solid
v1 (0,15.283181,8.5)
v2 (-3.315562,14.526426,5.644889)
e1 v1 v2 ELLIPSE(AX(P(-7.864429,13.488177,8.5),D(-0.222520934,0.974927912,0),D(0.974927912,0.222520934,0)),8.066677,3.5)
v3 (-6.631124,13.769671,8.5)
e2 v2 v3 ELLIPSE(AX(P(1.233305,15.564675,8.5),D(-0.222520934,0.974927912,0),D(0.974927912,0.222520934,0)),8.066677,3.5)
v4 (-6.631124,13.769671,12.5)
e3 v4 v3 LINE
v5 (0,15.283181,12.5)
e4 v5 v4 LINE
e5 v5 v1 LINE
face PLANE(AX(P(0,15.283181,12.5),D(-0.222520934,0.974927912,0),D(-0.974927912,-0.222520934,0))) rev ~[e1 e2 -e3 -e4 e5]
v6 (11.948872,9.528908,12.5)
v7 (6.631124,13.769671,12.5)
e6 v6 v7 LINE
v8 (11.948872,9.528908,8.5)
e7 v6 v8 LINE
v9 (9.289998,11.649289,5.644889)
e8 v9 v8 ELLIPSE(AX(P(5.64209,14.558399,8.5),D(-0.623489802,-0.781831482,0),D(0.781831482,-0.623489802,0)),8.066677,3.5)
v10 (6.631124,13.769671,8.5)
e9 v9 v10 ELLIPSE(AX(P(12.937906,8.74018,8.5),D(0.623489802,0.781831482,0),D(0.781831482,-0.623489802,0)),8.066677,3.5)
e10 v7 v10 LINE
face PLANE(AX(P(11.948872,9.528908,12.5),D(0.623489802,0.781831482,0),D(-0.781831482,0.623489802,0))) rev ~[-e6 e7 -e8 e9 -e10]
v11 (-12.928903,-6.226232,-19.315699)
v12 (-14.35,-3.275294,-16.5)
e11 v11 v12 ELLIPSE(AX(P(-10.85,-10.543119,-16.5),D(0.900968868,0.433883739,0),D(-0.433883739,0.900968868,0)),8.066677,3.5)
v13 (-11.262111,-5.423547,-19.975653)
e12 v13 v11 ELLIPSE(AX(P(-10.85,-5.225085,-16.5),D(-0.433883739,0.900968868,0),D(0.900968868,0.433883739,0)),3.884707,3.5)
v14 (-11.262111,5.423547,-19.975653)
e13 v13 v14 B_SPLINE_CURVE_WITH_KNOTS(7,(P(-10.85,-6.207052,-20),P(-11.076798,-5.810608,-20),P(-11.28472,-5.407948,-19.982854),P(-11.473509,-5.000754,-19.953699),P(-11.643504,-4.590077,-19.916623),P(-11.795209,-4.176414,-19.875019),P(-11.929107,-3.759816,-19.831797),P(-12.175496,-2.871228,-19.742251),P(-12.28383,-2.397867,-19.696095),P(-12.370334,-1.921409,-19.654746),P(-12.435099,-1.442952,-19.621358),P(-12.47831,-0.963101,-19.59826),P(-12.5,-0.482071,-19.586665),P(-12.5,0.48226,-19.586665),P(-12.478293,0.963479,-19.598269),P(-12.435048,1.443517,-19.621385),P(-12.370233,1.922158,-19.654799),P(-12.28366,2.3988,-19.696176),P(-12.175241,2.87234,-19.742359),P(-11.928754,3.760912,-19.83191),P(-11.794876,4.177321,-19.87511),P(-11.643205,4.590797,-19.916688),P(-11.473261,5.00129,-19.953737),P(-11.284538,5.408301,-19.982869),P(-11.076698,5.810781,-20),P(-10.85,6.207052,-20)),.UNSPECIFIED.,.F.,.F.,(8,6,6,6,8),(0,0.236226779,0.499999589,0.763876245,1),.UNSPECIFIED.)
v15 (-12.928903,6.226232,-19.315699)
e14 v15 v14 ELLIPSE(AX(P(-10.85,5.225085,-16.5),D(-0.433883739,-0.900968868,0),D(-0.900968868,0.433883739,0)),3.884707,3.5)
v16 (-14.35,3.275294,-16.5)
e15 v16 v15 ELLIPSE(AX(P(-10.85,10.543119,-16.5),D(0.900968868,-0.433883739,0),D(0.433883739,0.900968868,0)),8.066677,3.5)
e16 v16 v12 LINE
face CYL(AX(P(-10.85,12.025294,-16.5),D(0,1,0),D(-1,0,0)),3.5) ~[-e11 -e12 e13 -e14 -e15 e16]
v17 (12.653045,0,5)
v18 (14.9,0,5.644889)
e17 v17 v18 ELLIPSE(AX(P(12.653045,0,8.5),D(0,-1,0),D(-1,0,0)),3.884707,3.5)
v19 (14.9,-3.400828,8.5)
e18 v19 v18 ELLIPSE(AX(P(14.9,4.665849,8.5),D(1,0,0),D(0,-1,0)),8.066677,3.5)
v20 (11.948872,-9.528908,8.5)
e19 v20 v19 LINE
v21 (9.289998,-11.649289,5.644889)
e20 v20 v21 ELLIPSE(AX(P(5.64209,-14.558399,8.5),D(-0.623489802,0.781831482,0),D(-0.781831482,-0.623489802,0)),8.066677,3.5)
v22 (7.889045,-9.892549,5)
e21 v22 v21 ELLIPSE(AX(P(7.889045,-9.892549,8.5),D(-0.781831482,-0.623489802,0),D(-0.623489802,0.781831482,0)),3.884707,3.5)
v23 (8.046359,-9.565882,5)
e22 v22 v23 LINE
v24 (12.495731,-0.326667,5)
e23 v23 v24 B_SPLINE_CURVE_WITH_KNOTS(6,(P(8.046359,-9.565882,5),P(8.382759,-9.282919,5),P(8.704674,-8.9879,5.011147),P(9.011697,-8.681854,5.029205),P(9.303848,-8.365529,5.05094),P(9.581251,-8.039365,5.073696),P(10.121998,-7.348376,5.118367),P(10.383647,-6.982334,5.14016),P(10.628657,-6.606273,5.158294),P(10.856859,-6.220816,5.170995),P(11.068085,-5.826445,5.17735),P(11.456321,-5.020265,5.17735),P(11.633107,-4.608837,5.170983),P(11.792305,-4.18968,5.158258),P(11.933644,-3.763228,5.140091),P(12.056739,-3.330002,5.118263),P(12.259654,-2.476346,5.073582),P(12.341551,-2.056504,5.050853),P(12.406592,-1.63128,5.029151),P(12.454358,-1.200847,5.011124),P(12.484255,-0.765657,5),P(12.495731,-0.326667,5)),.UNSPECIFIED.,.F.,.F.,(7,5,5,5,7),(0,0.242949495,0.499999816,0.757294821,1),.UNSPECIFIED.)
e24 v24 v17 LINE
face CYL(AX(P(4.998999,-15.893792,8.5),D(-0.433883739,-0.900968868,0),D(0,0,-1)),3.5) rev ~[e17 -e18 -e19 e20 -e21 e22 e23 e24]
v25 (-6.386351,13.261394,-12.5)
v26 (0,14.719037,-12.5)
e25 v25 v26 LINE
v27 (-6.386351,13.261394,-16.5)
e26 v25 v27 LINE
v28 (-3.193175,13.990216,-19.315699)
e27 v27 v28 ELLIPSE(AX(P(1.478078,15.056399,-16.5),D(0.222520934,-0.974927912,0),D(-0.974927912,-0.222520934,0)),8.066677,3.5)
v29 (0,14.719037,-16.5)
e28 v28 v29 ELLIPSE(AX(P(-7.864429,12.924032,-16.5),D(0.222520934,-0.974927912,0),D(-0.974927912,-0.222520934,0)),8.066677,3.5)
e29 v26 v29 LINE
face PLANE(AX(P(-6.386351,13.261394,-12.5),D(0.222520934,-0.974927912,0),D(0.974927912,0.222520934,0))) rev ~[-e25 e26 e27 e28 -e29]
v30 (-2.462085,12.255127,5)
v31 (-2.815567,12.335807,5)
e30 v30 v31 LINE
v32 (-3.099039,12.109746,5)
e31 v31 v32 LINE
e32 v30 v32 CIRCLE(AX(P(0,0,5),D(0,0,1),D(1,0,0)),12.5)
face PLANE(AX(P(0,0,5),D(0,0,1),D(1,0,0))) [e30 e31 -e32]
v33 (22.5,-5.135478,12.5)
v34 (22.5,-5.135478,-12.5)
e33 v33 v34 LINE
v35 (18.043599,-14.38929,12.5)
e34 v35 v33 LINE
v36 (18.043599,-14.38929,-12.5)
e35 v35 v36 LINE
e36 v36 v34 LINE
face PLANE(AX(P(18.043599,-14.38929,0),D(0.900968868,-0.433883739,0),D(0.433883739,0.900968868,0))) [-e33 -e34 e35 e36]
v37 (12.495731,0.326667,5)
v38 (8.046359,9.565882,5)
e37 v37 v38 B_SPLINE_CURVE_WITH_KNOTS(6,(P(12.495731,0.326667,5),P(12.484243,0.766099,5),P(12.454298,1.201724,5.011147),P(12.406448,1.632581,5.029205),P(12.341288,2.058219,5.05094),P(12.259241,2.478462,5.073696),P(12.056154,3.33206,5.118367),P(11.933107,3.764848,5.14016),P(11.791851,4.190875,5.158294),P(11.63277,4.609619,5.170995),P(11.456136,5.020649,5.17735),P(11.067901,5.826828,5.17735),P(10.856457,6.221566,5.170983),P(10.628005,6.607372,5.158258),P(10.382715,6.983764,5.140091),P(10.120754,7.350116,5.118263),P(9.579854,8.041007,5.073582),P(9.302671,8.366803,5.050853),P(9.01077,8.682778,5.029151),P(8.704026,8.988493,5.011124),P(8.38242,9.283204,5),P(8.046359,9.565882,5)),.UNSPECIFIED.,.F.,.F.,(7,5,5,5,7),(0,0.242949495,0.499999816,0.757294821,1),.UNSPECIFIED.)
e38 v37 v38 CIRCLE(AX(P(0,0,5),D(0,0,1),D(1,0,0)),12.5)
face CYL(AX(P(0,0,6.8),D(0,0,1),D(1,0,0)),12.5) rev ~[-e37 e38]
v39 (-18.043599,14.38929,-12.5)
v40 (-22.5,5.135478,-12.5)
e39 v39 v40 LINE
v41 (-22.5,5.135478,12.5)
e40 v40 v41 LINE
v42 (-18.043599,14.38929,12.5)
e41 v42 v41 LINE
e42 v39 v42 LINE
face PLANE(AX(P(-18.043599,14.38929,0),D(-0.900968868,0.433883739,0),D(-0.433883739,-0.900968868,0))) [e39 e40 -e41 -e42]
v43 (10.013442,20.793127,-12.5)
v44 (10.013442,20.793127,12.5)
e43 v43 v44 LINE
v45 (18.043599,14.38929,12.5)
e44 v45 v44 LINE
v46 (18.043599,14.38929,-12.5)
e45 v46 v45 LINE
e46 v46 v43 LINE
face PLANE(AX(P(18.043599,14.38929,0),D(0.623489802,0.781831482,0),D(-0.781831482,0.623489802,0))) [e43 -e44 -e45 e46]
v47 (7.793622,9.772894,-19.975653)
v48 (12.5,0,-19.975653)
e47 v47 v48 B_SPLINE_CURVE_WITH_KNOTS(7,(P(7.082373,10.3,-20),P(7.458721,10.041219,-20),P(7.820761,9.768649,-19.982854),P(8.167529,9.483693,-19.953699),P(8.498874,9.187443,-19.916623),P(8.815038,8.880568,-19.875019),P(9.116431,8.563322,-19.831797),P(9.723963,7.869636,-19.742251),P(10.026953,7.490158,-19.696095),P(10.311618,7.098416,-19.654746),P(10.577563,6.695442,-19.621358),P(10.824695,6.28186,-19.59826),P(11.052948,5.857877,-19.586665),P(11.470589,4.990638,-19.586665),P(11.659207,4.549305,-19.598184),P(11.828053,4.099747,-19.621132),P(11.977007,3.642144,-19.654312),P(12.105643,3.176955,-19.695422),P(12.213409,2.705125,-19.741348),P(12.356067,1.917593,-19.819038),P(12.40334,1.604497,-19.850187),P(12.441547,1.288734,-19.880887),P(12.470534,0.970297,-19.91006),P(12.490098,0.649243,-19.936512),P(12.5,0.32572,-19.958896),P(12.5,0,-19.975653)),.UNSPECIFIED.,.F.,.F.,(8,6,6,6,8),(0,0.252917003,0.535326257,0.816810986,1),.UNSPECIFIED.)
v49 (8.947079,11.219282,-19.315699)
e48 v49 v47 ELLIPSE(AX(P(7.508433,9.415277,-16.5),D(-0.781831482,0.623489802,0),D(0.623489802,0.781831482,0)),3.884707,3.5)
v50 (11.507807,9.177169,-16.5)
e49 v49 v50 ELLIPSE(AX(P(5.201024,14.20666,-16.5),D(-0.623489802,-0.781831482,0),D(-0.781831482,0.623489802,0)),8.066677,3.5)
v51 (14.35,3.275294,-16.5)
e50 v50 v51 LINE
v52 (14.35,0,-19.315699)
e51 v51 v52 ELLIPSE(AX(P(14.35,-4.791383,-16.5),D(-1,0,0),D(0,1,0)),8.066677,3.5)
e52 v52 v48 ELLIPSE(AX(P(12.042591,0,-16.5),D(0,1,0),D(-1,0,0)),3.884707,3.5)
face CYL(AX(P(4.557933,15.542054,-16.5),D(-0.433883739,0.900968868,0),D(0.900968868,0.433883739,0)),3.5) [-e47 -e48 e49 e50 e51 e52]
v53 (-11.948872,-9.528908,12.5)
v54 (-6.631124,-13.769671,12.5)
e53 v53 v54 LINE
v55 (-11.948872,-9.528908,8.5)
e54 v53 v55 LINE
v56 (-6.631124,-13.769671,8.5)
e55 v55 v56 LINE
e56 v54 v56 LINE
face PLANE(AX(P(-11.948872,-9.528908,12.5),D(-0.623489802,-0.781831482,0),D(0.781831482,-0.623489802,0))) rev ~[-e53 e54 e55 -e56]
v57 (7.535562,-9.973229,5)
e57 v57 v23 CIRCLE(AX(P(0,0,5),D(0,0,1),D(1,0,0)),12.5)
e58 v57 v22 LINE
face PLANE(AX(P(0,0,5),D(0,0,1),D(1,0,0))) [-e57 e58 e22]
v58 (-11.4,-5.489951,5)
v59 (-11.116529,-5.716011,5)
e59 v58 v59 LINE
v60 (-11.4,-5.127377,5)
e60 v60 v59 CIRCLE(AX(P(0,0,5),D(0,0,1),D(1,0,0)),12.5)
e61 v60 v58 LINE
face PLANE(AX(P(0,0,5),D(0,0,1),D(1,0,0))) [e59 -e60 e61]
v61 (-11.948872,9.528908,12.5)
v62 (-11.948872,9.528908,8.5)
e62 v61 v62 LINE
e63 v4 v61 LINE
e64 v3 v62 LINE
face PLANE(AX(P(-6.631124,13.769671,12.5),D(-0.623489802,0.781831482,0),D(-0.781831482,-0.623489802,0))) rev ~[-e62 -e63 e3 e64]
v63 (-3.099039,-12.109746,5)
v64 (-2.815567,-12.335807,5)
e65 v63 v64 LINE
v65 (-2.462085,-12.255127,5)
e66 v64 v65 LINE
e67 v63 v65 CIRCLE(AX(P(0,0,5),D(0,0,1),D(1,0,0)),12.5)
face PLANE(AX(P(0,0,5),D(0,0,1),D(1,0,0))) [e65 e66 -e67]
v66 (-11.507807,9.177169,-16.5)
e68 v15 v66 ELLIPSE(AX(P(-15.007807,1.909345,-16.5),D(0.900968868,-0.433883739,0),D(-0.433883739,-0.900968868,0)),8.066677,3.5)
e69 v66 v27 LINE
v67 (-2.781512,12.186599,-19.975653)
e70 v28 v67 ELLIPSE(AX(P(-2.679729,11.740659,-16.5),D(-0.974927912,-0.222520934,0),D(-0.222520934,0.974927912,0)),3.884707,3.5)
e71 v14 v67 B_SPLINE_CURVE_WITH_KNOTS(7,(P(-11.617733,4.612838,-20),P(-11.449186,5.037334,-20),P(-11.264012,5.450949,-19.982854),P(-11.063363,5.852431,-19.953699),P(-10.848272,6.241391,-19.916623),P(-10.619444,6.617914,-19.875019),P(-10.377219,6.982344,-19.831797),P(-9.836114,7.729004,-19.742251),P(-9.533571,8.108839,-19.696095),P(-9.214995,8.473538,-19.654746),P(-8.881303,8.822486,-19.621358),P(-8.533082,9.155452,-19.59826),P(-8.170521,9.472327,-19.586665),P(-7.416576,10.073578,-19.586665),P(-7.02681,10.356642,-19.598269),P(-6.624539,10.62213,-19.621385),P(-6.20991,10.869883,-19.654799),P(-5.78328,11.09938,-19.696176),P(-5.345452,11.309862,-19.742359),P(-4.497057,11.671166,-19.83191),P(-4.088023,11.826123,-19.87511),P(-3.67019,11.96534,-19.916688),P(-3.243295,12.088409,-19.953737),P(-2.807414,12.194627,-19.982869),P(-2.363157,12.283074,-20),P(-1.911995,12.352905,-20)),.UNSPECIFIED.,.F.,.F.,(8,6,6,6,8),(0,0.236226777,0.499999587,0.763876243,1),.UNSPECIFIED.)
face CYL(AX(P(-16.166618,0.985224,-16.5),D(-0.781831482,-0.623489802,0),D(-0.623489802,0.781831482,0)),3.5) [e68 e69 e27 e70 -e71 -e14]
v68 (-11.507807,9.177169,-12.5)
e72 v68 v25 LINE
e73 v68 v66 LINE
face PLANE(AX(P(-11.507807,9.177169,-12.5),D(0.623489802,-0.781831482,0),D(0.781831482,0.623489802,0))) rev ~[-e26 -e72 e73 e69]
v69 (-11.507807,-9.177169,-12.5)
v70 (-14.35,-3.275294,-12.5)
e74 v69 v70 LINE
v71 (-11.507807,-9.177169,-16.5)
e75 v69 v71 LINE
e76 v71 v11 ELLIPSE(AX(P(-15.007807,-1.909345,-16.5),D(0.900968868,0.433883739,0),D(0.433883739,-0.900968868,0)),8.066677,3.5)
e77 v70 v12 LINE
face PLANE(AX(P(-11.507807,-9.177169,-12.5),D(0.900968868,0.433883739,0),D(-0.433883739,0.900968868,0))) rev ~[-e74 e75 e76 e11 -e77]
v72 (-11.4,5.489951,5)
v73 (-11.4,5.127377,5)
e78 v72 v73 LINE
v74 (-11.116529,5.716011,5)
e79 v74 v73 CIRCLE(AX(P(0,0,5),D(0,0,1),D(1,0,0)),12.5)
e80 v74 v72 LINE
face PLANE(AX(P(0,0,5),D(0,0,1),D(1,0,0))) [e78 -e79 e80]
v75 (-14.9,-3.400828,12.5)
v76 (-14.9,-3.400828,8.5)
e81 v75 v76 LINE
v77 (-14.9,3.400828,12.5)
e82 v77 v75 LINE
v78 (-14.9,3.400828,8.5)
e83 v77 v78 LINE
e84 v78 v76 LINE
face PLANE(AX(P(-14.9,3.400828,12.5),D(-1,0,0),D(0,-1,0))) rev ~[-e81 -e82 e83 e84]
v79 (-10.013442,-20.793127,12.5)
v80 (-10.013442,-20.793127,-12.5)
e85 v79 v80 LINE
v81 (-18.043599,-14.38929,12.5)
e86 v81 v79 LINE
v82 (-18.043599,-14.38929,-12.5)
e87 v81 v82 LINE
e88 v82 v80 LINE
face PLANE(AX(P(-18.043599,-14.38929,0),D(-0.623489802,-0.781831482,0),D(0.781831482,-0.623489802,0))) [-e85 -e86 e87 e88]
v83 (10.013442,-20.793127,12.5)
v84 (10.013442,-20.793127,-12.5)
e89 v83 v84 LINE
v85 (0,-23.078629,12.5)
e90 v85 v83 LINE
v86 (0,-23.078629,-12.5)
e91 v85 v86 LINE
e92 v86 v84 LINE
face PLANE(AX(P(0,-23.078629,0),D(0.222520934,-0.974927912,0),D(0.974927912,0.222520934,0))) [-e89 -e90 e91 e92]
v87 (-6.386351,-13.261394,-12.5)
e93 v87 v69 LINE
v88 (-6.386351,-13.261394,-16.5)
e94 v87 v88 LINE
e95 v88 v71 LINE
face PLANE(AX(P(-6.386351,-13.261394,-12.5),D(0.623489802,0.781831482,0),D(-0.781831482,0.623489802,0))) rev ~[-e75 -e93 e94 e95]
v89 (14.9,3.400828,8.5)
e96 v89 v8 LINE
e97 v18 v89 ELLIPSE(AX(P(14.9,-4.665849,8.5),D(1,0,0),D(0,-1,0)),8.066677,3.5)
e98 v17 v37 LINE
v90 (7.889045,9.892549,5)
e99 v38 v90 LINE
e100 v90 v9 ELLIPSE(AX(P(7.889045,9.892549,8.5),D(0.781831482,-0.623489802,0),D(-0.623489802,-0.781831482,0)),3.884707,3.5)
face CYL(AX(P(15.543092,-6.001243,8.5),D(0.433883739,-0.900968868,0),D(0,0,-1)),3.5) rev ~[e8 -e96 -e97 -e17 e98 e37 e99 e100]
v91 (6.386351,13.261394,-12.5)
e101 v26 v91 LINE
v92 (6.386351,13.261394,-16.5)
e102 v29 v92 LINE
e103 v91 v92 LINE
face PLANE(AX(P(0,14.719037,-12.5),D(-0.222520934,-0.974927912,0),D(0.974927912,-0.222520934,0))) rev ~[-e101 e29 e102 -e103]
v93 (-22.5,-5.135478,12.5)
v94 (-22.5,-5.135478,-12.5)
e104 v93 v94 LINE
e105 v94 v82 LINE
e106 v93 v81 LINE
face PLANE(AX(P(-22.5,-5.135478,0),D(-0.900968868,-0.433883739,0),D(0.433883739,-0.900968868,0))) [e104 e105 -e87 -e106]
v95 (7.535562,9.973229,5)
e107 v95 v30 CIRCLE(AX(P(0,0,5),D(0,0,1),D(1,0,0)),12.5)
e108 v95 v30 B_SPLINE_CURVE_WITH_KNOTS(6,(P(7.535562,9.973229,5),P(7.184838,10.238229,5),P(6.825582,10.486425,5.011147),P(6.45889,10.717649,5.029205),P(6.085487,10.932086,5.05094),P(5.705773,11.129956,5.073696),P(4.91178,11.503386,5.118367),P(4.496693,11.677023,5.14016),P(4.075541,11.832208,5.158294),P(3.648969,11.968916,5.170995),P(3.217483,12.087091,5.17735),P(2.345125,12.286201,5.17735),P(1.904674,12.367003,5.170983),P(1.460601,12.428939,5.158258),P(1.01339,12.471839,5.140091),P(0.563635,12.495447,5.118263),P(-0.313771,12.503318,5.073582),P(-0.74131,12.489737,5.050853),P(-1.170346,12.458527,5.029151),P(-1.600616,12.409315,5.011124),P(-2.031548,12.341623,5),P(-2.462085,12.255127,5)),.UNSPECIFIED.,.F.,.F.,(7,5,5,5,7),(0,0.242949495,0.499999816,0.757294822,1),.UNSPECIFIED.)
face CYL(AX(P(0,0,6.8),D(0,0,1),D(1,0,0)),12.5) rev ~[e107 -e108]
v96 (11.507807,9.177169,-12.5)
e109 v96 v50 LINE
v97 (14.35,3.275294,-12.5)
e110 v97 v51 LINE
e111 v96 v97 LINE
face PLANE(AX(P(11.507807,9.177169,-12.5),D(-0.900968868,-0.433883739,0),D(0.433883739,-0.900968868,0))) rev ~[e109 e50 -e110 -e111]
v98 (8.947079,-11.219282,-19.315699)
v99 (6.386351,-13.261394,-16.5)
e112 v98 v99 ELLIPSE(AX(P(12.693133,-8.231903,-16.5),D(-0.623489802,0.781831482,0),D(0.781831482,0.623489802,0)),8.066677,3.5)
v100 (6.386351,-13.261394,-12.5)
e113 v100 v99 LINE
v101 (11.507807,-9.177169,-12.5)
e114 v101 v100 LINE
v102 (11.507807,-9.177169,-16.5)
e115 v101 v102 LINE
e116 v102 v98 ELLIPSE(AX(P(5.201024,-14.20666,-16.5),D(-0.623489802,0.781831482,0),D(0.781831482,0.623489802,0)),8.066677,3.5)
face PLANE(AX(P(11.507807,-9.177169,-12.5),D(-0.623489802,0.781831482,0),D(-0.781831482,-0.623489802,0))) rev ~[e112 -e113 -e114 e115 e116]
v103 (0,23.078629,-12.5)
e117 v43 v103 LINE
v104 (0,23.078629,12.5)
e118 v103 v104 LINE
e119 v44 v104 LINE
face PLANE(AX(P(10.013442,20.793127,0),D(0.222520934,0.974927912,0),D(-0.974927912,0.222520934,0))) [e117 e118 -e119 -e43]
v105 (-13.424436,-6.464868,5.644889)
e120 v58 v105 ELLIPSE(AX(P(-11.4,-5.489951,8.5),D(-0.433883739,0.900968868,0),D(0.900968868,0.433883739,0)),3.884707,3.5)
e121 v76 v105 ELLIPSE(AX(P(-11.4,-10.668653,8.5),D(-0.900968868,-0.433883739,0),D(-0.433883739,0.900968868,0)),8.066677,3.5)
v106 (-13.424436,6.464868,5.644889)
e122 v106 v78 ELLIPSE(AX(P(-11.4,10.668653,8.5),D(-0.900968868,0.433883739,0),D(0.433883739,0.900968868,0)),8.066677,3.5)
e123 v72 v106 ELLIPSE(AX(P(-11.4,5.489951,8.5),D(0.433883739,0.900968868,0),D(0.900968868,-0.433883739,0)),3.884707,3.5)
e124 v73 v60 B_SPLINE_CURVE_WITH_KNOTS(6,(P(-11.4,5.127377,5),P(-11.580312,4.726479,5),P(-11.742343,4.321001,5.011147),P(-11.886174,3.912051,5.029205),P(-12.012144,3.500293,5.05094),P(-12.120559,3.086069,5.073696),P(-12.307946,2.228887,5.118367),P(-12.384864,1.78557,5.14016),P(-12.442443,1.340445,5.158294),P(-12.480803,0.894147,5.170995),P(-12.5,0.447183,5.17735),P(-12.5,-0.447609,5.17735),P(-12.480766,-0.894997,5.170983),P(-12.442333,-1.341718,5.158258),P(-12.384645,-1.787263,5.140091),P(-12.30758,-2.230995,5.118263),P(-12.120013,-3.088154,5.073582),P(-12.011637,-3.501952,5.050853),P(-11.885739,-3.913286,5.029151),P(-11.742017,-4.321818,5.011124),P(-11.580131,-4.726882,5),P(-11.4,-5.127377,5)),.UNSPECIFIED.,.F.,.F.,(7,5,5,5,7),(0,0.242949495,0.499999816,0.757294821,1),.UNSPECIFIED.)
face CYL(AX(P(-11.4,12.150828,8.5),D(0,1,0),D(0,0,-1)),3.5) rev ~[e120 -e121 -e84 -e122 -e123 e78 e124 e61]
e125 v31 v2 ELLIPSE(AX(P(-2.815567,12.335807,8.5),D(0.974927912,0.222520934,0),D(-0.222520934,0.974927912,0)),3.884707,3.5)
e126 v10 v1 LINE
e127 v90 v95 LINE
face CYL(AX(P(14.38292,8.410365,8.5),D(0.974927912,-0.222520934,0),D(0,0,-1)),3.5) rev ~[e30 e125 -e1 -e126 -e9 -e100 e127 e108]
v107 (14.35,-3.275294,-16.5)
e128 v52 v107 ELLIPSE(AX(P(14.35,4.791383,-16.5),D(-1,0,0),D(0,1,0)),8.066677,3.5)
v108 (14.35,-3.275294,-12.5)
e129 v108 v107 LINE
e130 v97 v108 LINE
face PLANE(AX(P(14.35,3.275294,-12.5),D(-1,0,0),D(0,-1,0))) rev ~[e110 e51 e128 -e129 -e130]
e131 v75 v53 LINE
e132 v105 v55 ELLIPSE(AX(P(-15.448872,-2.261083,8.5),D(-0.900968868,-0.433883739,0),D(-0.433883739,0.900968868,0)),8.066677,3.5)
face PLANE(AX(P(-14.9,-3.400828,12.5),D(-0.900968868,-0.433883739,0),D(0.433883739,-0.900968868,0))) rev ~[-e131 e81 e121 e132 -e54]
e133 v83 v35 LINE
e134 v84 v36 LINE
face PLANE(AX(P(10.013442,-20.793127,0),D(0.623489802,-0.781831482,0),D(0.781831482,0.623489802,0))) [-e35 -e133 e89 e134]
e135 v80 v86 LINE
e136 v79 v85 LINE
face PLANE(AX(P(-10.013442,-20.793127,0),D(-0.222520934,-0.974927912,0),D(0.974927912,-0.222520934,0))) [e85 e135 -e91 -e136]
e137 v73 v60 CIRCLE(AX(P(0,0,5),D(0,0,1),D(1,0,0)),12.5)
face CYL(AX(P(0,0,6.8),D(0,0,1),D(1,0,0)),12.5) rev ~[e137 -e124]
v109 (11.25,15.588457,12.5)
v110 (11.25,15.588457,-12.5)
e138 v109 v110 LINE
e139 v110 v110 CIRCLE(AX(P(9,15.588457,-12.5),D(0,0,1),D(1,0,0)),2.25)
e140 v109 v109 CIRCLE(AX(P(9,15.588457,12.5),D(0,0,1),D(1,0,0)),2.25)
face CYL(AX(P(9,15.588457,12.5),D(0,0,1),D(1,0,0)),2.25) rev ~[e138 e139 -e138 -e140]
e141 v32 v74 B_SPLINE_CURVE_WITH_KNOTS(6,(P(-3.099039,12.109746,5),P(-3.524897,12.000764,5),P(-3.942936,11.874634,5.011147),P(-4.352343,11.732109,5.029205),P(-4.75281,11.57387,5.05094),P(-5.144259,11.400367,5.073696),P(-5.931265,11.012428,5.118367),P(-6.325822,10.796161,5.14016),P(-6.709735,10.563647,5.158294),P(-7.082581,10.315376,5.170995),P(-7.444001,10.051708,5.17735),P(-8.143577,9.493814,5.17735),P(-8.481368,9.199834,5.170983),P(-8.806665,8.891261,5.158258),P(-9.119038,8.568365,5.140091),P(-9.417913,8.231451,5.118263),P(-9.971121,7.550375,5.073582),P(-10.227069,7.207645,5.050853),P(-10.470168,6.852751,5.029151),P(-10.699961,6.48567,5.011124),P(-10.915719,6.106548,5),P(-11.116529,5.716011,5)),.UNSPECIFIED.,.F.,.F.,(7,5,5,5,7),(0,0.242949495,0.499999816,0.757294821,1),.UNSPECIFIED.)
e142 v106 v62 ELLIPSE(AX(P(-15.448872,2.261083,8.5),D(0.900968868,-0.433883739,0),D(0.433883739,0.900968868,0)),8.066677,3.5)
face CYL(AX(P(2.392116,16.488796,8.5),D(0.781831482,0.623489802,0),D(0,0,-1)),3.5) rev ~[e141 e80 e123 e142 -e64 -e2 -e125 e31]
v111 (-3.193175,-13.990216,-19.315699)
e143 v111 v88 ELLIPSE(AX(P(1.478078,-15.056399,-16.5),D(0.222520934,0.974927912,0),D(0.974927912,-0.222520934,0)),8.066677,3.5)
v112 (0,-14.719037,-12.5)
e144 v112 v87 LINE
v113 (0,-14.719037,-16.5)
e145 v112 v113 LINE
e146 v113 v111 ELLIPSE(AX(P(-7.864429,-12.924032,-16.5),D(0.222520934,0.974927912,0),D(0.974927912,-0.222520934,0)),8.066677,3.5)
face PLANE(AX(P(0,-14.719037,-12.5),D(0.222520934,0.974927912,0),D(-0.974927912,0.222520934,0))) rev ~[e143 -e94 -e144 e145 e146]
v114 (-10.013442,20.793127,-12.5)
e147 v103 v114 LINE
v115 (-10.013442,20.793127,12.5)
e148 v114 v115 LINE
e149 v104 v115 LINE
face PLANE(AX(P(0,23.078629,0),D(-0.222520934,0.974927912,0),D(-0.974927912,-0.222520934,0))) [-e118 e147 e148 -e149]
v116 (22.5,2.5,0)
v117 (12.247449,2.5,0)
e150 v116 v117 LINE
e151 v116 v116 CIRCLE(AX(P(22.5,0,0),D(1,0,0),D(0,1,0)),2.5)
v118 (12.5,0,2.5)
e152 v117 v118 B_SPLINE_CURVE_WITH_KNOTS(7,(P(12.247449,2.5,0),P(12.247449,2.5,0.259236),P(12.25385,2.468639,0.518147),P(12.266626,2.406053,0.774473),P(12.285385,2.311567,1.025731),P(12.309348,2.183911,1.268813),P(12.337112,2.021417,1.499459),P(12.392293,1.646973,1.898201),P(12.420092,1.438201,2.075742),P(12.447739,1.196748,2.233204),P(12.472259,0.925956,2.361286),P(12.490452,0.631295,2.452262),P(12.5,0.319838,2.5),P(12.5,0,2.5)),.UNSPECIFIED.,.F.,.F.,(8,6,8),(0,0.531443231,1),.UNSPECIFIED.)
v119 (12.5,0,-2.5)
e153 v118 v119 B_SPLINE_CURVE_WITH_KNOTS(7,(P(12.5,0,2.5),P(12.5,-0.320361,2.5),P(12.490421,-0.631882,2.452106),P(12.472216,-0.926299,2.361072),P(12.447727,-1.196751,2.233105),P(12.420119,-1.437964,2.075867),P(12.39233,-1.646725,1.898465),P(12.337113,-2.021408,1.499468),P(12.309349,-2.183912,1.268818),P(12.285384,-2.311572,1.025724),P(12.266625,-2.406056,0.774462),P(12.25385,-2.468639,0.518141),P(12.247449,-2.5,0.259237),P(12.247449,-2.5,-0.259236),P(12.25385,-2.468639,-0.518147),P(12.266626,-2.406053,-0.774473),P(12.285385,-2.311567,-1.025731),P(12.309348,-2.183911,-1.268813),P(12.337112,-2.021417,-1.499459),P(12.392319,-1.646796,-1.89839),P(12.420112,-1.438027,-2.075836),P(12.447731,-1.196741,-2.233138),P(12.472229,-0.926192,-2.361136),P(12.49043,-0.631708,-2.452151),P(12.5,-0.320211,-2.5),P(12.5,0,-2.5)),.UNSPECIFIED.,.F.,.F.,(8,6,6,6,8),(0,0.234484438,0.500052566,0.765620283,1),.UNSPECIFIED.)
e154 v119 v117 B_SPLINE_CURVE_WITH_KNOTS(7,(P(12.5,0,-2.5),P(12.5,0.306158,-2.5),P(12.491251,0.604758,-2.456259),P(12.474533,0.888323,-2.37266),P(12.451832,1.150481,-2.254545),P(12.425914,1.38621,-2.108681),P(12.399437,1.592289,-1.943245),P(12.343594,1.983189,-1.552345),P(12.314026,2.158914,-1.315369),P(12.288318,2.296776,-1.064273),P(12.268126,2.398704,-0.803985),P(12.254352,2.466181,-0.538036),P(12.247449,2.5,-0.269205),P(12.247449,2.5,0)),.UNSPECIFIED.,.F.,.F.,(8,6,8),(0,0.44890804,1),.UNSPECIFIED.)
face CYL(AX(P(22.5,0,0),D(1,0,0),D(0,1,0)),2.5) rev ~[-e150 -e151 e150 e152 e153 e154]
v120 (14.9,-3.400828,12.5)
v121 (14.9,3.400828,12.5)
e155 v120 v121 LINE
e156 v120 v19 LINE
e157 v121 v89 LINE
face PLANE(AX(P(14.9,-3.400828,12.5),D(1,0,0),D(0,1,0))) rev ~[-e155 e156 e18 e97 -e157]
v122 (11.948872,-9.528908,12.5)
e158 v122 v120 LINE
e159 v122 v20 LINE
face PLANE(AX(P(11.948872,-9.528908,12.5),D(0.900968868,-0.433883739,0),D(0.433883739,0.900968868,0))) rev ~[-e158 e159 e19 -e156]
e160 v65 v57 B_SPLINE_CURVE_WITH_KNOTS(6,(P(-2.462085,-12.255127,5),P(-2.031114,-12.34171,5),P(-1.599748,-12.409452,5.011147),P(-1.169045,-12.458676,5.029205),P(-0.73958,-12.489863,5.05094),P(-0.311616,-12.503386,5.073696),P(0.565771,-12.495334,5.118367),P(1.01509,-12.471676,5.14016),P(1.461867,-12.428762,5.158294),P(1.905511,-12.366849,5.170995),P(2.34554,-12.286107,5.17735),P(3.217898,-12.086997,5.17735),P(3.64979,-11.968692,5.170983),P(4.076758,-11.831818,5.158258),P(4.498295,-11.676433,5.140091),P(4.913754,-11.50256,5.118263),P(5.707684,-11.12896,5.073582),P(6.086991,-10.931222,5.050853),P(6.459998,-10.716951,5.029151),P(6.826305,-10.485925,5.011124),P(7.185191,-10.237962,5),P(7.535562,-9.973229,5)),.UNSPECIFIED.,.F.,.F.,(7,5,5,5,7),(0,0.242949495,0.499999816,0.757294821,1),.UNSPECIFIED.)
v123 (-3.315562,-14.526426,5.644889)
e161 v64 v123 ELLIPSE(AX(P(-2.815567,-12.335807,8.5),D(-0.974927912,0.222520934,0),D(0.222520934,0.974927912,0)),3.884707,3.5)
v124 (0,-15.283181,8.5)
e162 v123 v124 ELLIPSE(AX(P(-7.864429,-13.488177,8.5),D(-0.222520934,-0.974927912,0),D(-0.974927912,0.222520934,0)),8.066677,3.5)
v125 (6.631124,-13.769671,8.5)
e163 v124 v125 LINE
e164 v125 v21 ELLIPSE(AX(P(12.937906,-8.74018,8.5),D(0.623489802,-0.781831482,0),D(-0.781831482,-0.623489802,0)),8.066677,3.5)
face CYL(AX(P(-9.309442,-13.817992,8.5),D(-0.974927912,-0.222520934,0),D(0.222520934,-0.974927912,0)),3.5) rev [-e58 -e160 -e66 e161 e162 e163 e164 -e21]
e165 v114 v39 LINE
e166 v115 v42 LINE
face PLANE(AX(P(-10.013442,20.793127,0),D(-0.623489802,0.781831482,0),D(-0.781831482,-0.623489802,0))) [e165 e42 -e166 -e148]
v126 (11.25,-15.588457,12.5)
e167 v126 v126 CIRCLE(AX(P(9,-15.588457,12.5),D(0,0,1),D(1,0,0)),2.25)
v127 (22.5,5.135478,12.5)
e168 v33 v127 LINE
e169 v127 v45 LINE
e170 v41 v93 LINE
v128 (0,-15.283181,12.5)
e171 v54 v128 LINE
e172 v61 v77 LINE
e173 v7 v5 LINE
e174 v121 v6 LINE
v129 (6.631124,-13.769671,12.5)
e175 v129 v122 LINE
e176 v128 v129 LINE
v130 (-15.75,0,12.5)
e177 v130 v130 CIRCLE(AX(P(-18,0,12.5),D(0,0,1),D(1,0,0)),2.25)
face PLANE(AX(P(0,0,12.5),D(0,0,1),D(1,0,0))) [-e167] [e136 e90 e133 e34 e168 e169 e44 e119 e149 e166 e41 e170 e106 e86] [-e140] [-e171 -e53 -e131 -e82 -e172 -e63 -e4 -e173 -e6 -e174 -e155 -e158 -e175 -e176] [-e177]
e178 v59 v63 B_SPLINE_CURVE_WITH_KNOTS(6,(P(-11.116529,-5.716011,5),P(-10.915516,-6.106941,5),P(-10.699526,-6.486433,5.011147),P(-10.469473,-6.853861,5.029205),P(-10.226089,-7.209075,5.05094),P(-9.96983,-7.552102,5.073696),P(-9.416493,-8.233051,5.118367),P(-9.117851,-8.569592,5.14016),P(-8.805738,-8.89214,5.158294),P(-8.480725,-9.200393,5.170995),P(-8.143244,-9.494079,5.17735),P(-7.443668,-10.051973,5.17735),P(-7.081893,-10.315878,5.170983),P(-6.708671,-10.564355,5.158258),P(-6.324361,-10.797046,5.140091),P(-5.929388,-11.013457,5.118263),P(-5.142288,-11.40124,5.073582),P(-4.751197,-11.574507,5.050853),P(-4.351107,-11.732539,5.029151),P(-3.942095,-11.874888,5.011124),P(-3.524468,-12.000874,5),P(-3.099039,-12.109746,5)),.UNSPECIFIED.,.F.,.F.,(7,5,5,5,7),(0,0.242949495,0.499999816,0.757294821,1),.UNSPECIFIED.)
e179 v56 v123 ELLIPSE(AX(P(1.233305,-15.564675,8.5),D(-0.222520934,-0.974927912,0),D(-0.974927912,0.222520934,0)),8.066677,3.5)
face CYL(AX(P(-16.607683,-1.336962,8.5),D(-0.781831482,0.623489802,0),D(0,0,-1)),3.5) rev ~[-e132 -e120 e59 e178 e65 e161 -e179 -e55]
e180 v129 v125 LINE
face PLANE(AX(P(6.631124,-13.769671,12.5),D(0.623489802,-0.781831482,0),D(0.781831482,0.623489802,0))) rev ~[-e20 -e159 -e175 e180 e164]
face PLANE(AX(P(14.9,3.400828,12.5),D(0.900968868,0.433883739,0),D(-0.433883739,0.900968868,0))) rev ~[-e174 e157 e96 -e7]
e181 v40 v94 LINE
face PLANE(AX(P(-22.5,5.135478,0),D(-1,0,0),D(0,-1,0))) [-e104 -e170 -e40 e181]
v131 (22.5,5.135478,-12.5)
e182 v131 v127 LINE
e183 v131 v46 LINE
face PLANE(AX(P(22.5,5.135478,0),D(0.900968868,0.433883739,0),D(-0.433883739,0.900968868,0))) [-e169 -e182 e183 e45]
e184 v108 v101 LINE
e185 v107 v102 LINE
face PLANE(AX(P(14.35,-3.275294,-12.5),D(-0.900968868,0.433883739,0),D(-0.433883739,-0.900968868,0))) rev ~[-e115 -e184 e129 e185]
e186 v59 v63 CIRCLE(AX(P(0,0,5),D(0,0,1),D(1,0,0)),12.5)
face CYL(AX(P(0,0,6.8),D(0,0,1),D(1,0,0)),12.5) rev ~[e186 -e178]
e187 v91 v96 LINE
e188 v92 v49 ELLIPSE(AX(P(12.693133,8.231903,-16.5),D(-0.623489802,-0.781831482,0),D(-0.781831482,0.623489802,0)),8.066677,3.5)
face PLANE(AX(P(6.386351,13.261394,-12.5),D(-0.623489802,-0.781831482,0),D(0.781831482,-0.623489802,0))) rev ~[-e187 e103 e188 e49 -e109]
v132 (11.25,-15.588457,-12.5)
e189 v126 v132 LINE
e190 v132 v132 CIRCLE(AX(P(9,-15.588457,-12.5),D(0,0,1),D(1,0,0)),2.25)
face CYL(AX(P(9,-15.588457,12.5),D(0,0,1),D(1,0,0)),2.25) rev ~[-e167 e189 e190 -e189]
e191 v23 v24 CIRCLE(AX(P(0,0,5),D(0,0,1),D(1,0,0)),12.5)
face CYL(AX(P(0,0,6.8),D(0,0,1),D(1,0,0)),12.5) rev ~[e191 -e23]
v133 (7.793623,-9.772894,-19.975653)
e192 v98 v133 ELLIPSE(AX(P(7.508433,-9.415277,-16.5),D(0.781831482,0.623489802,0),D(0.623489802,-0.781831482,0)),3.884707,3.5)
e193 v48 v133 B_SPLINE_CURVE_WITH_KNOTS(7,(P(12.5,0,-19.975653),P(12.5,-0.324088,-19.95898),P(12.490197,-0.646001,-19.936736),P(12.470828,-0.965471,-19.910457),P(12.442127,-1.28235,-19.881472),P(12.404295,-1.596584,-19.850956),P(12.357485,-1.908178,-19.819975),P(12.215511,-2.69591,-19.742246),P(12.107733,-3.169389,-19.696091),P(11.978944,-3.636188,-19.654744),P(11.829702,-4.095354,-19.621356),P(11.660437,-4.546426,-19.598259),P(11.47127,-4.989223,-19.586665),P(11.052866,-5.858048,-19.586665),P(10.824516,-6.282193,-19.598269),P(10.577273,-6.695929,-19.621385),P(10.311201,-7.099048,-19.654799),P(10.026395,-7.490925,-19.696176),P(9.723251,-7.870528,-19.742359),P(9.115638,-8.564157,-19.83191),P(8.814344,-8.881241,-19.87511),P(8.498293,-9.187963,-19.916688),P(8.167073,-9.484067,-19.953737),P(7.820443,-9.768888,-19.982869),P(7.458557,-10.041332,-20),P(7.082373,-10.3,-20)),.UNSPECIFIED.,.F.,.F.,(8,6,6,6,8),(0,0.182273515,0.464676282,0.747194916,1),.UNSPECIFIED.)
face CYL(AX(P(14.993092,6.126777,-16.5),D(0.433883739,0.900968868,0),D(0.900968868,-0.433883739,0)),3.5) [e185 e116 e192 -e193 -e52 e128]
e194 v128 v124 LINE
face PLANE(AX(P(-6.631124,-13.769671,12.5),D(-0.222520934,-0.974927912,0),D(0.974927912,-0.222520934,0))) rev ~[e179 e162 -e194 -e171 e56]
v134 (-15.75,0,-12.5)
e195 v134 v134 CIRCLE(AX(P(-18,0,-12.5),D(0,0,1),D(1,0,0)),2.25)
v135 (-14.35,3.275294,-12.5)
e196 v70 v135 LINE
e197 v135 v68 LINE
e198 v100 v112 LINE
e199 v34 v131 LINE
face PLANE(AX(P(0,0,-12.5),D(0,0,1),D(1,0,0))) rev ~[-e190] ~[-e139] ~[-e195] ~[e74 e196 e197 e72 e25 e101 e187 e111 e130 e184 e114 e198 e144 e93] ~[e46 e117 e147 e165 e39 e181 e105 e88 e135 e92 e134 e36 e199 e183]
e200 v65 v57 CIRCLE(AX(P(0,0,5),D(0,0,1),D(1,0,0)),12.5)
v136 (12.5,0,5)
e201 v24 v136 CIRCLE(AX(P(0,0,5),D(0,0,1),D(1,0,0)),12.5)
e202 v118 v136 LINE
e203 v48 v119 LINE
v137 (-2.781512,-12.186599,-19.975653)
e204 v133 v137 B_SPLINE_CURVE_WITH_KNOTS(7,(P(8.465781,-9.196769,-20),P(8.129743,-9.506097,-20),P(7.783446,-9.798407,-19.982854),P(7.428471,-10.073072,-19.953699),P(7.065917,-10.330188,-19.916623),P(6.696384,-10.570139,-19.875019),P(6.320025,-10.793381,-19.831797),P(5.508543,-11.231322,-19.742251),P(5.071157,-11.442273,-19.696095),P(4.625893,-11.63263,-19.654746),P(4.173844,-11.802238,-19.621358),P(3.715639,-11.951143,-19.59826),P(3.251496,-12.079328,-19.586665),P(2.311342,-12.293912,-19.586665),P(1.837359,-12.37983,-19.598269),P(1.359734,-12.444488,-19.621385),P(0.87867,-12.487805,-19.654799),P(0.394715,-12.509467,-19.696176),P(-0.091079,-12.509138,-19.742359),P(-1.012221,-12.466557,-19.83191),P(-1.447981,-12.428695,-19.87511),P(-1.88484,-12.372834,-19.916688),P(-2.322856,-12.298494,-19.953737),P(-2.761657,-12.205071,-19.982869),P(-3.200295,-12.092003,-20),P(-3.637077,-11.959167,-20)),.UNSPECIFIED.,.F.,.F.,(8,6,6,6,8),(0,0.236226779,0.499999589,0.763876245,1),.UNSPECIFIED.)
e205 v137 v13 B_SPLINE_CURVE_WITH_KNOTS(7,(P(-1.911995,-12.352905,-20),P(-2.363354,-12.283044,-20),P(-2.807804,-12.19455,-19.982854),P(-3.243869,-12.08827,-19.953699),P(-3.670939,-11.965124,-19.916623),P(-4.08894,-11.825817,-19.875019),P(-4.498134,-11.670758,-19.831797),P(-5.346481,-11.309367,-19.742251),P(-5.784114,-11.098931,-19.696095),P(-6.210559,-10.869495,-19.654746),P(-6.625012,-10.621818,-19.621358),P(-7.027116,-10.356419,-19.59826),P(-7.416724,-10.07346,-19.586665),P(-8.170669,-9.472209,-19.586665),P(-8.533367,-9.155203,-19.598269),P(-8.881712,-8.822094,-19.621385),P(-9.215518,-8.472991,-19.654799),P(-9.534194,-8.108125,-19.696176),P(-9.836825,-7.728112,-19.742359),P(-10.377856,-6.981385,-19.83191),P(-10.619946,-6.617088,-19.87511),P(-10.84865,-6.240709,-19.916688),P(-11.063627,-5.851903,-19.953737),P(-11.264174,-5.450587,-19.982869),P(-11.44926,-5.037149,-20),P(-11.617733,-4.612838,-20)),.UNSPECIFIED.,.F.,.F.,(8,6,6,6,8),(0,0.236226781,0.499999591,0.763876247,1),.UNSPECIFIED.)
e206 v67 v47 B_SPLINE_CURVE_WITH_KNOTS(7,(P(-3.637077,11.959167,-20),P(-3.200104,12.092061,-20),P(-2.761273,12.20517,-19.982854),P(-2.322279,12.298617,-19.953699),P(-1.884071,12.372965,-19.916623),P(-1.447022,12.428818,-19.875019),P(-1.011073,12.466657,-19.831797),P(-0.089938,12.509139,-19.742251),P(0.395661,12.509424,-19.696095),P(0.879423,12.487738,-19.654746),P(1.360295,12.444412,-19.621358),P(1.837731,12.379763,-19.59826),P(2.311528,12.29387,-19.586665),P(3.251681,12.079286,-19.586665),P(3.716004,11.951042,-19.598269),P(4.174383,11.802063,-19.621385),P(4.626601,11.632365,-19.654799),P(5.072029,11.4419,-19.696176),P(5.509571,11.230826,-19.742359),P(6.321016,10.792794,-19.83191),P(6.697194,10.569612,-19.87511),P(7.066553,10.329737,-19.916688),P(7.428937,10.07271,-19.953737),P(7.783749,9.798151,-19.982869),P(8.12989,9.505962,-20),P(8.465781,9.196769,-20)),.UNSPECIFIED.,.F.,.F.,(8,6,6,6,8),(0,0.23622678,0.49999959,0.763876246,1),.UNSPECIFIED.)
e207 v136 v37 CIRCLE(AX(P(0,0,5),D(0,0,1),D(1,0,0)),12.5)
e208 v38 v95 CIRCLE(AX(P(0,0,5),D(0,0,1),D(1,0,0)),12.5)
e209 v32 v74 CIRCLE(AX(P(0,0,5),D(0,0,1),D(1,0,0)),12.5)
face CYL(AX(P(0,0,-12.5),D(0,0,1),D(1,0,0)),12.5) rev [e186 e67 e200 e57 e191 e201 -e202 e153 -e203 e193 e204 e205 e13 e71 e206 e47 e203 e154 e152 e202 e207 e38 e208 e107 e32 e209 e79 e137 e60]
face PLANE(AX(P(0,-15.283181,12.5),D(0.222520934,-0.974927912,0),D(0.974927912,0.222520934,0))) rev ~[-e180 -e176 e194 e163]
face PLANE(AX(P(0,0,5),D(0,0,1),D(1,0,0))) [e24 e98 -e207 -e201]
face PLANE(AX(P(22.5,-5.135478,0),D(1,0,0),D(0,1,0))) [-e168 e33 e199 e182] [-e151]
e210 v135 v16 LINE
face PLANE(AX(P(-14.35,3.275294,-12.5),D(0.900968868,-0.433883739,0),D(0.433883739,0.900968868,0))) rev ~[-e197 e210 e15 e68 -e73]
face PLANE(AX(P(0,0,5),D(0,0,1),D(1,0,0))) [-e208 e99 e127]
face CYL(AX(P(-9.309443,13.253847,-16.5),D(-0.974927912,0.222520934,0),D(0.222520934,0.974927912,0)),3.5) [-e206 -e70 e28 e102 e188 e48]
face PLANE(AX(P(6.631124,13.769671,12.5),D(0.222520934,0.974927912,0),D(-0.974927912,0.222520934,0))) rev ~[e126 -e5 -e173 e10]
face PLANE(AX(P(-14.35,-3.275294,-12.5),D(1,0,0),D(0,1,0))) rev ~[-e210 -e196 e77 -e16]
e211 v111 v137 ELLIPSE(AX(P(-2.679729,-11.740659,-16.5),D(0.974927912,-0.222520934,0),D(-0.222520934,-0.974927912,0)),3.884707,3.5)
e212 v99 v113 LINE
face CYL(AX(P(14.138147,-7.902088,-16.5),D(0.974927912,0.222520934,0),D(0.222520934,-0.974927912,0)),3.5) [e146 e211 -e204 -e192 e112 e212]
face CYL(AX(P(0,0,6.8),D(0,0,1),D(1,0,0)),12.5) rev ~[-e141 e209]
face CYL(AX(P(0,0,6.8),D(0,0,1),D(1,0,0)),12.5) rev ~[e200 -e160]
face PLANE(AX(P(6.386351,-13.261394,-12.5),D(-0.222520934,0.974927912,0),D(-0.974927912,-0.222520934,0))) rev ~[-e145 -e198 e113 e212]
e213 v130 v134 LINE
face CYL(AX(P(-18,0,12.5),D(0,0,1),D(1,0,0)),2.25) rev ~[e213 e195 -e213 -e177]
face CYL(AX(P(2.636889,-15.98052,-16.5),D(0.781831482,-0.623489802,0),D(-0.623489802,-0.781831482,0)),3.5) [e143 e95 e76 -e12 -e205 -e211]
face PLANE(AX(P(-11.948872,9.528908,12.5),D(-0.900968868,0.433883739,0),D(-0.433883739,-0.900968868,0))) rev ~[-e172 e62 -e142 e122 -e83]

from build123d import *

# Parameters (mm, degrees)
F0_R         = 12.5
F1_DEPTH     = 12.5
F2_R         = 2.25
F3_DEPTH     = 25
F4_R         = 12.5
F5_DEPTH     = 7.5
F6_R         = 12.5
F7_DEPTH     = 7.5
F8_T4_DEPTH  = 24.3016555368
F8_S5_R      = 12.5
F8_T6_DEPTH  = 15
F8_T11_DEPTH = 24.3016555368
F8_S12_R     = 12.5
F8_T13_DEPTH = 14
F8_T17_DEPTH = 24.3016555368
F8_S18_R     = 12.5
F8_T19_DEPTH = 15
F8_T24_DEPTH = 24.3016555368
F8_S25_R     = 12.5
F8_T26_DEPTH = 15
F8_T30_DEPTH = 24.3016555368
F8_S31_R     = 12.5
F8_T32_DEPTH = 15
F8_T37_DEPTH = 24.3016555368
F8_S38_R     = 12.5
F8_T39_DEPTH = 15
F8_T44_DEPTH = 24.3016555368
F8_S45_R     = 12.5
F8_T46_DEPTH = 15
F9_T1_DEPTH  = 24.050587715
F9_T3_DEPTH  = 24.050587715
F9_T5_DEPTH  = 24.050587715
F9_T7_DEPTH  = 24.050587715
F9_T9_DEPTH  = 24.050587715
F9_T11_DEPTH = 24.050587715
F9_T13_DEPTH = 24.050587715
F10_R        = 2.5
F11_DEPTH    = 12


# Not quite as in the source:
# - a fillet or chamfer that OpenCascade refuses, or shapes differently, is made with other operations: its cross-section is extruded or revolved along the edge and cut away or added


with BuildPart() as f1:
    # F0 (on Top) → F1 (new body, symmetric)
    with BuildSketch(Plane.XY):
        Polygon((22.5, -5.1354781738), (22.5, 5.1354781738), (18.0435990556, 14.3892900865), (10.013442028, 20.7931266245), (0, 23.0786294236), (-10.013442028, 20.7931266245), (-18.0435990556, 14.3892900865), (-22.5, 5.1354781738), (-22.5, -5.1354781738), (-18.0435990556, -14.3892900865), (-10.013442028, -20.7931266245), (0, -23.0786294236), (10.013442028, -20.7931266245), (18.0435990556, -14.3892900865), align=None)
        Circle(F0_R, mode=Mode.SUBTRACT)
    extrude(amount=F1_DEPTH, both=True)

    # F2 (on face) → F3 (cut)
    with BuildSketch(Plane.XY.offset(12.5)):
        with Locations((9, 15.5884572681)):
            Circle(F2_R)
        with Locations((-18, 0)):
            Circle(F2_R)
        with Locations((9, -15.5884572681)):
            Circle(F2_R)
    extrude(amount=-F3_DEPTH, mode=Mode.SUBTRACT)

    # F4 (on face) → F5 (cut)
    with BuildSketch(Plane.XY.offset(12.5)):
        Polygon((14.9, -3.4008277684), (14.9, 3.4008277684), (11.9488722635, 9.5289076573), (6.6311238319, 13.7696705203), (0, 15.2831812628), (-6.6311238319, 13.7696705203), (-11.9488722635, 9.5289076573), (-14.9, 3.4008277684), (-14.9, -3.4008277684), (-11.9488722635, -9.5289076573), (-6.6311238319, -13.7696705203), (0, -15.2831812628), (6.6311238319, -13.7696705203), (11.9488722635, -9.5289076573), align=None)
        Circle(F4_R, mode=Mode.SUBTRACT)
    extrude(amount=-F5_DEPTH, mode=Mode.SUBTRACT)

    # F6 (on face) → F7 (join)
    with BuildSketch(Plane(origin=(0, 0, -12.5), x_dir=(1, 0, 0), z_dir=(0, 0, -1))):
        Polygon((14.35, -3.2752938575), (14.35, 3.2752938575), (11.5078065088, 9.1771694552), (6.3863508045, 13.2613940917), (0, 14.719036988), (-6.3863508045, 13.2613940917), (-11.5078065088, 9.1771694552), (-14.35, 3.2752938575), (-14.35, -3.2752938575), (-11.5078065088, -9.1771694552), (-6.3863508045, -13.2613940917), (0, -14.719036988), (6.3863508045, -13.2613940917), (11.5078065088, -9.1771694552), align=None)
        Circle(F6_R, mode=Mode.SUBTRACT)
    extrude(amount=F7_DEPTH)

    # F8: fillet of radius 3.5 on 7 edges, made by hand


with BuildPart() as f8_tool2:
    # F8_s3 → F8_t4 (new body)
    with BuildSketch(Plane(origin=(9.4998996874, 7.5759171977, 0), x_dir=(0, 0, 1), z_dir=(-0.7818314825, -0.6234898019, 0))):
        with BuildLine():
            ThreePointArc((5, 11.4), (6.0251262658, 13.8748737342), (8.5, 14.9))
            Line((8.5, 14.9), (5, 14.9))
            Line((5, 14.9), (5, 11.4))
        make_face()
    extrude(amount=F8_T4_DEPTH)

    # F8_s5 → F8_t6 (cut, symmetric)
    with BuildSketch(Plane.XY.offset(6.8)):
        Circle(F8_S5_R)
    extrude(amount=F8_T6_DEPTH, both=True, mode=Mode.SUBTRACT)

    split(bisect_by=Plane(origin=(-13.4244361317, 6.4648677129, 0), x_dir=(0, 0, 1), z_dir=(0.9009688679, -0.4338837391, 0)), keep=Keep.TOP)


with BuildPart() as f1_1:
    add(f1.part)

    # F8_t1: union F8_tool2
    add(f8_tool2.part)


with BuildPart() as f8_tool9:
    # F8_s10 → F8_t11 (new body)
    with BuildSketch(Plane.XZ.offset(-12.1508277684)):
        with BuildLine():
            ThreePointArc((-11.4, 5), (-13.8748737342, 6.0251262658), (-14.9, 8.5))
            Line((-14.9, 8.5), (-14.9, 5))
            Line((-14.9, 5), (-11.4, 5))
        make_face()
    extrude(amount=F8_T11_DEPTH)

    # F8_s12 → F8_t13 (cut, symmetric)
    with BuildSketch(Plane.XY.offset(6.8)):
        Circle(F8_S12_R)
    extrude(amount=F8_T13_DEPTH, both=True, mode=Mode.SUBTRACT)


with BuildPart() as f1_2:
    add(f1_1.part)

    # F8_t8: union F8_tool9
    add(f8_tool9.part)


with BuildPart() as f8_tool15:
    # F8_s16 → F8_t17 (new body)
    with BuildSketch(Plane(origin=(-9.4998996874, 7.5759171977, 0), x_dir=(0, 0, 1), z_dir=(0.7818314825, -0.6234898019, 0))):
        with BuildLine():
            ThreePointArc((5, 11.4), (6.0251262658, 13.8748737342), (8.5, 14.9))
            Line((8.5, 14.9), (5, 14.9))
            Line((5, 14.9), (5, 11.4))
        make_face()
    extrude(amount=F8_T17_DEPTH)

    # F8_s18 → F8_t19 (cut, symmetric)
    with BuildSketch(Plane.XY.offset(6.8)):
        Circle(F8_S18_R)
    extrude(amount=F8_T19_DEPTH, both=True, mode=Mode.SUBTRACT)

    split(bisect_by=Plane.YZ.offset(-14.9), keep=Keep.TOP)


with BuildPart() as f1_3:
    add(f1_2.part)

    # F8_t14: union F8_tool15
    add(f8_tool15.part)


with BuildPart() as f8_tool22:
    # F8_s23 → F8_t24 (new body)
    with BuildSketch(Plane(origin=(-11.8461811475, -2.7038135434, 0), x_dir=(0, 0, 1), z_dir=(0.9749279122, 0.222520934, 0))):
        with BuildLine():
            ThreePointArc((8.5, 14.9), (6.0251262658, 13.8748737342), (5, 11.4))
            Line((5, 11.4), (5, 14.9))
            Line((5, 14.9), (8.5, 14.9))
        make_face()
    extrude(amount=F8_T24_DEPTH)

    # F8_s25 → F8_t26 (cut, symmetric)
    with BuildSketch(Plane.XY.offset(6.8)):
        Circle(F8_S25_R)
    extrude(amount=F8_T26_DEPTH, both=True, mode=Mode.SUBTRACT)


with BuildPart() as f1_4:
    add(f1_3.part)

    # F8_t21: union F8_tool22
    add(f8_tool22.part)


with BuildPart() as f8_tool28:
    # F8_s29 → F8_t30 (new body)
    with BuildSketch(Plane(origin=(-5.2720465855, -10.9475175386, 0), x_dir=(0, 0, 1), z_dir=(0.4338837391, 0.9009688679, 0))):
        with BuildLine():
            ThreePointArc((5, 11.4), (6.0251262658, 13.8748737342), (8.5, 14.9))
            Line((8.5, 14.9), (5, 14.9))
            Line((5, 14.9), (5, 11.4))
        make_face()
    extrude(amount=F8_T30_DEPTH)

    # F8_s31 → F8_t32 (cut, symmetric)
    with BuildSketch(Plane.XY.offset(6.8)):
        Circle(F8_S31_R)
    extrude(amount=F8_T32_DEPTH, both=True, mode=Mode.SUBTRACT)

    split(bisect_by=Plane(origin=(9.2899980477, -11.6492890888, 0), x_dir=(0, 0, 1), z_dir=(-0.6234898019, 0.7818314825, 0)), keep=Keep.TOP)


with BuildPart() as f1_5:
    add(f1_4.part)

    # F8_t27: union F8_tool28
    add(f8_tool28.part)


with BuildPart() as f8_tool35:
    # F8_s36 → F8_t37 (new body)
    with BuildSketch(Plane(origin=(5.2720465855, -10.9475175386, 0), x_dir=(0, 0, 1), z_dir=(-0.4338837391, 0.9009688679, 0))):
        with BuildLine():
            ThreePointArc((5, 11.4), (6.0251262658, 13.8748737342), (8.5, 14.9))
            Line((8.5, 14.9), (5, 14.9))
            Line((5, 14.9), (5, 11.4))
        make_face()
    extrude(amount=F8_T37_DEPTH)

    # F8_s38 → F8_t39 (cut, symmetric)
    with BuildSketch(Plane.XY.offset(6.8)):
        Circle(F8_S38_R)
    extrude(amount=F8_T39_DEPTH, both=True, mode=Mode.SUBTRACT)

    split(bisect_by=Plane(origin=(9.2899980477, 11.6492890888, 0), x_dir=(0, 0, 1), z_dir=(-0.6234898019, -0.7818314825, 0)), keep=Keep.TOP)


with BuildPart() as f1_6:
    add(f1_5.part)

    # F8_t34: union F8_tool35
    add(f8_tool35.part)


with BuildPart() as f8_tool42:
    # F8_s43 → F8_t44 (new body)
    with BuildSketch(Plane(origin=(11.8461811475, -2.7038135434, 0), x_dir=(0, 0, 1), z_dir=(-0.9749279122, 0.222520934, 0))):
        with BuildLine():
            ThreePointArc((5, 11.4), (6.0251262658, 13.8748737342), (8.5, 14.9))
            Line((8.5, 14.9), (5, 14.9))
            Line((5, 14.9), (5, 11.4))
        make_face()
    extrude(amount=F8_T44_DEPTH)

    # F8_s45 → F8_t46 (cut, symmetric)
    with BuildSketch(Plane.XY.offset(6.8)):
        Circle(F8_S45_R)
    extrude(amount=F8_T46_DEPTH, both=True, mode=Mode.SUBTRACT)


with BuildPart() as f1_7:
    add(f1_6.part)

    # F8_t41: union F8_tool42
    add(f8_tool42.part)

    # F9: fillet of radius 3.5 on 7 edges, made by hand

    # F9_s2 → F9_t1 (cut)
    with BuildSketch(Plane(origin=(-5.2175794629, 10.834415393, 0), x_dir=(0, 0, 1), z_dir=(0.4338837391, -0.9009688679, 0))):
        with BuildLine():
            ThreePointArc((-16.5, -14.35), (-18.9748737342, -13.3248737342), (-20, -10.85))
            Line((-20, -10.85), (-20, -14.35))
            Line((-20, -14.35), (-16.5, -14.35))
        make_face()
    extrude(amount=F9_T1_DEPTH, mode=Mode.SUBTRACT)

    # F9_s4 → F9_t3 (cut)
    with BuildSketch(Plane(origin=(-11.7237946339, 2.6758796203, 0), x_dir=(0, 0, 1), z_dir=(0.9749279122, -0.222520934, 0))):
        with BuildLine():
            ThreePointArc((-16.5, -14.35), (-18.9748737342, -13.3248737342), (-20, -10.85))
            Line((-20, -10.85), (-20, -14.35))
            Line((-20, -14.35), (-16.5, -14.35))
        make_face()
    extrude(amount=F9_T3_DEPTH, mode=Mode.SUBTRACT)

    # F9_s6 → F9_t5 (cut)
    with BuildSketch(Plane(origin=(-9.4017533237, -7.4976480845, 0), x_dir=(0, 0, 1), z_dir=(0.7818314825, 0.6234898019, 0))):
        with BuildLine():
            ThreePointArc((-16.5, -14.35), (-18.9748737342, -13.3248737342), (-20, -10.85))
            Line((-20, -10.85), (-20, -14.35))
            Line((-20, -14.35), (-16.5, -14.35))
        make_face()
    extrude(amount=F9_T5_DEPTH, mode=Mode.SUBTRACT)

    # F9_s8 → F9_t7 (cut)
    with BuildSketch(Plane.XZ.offset(-12.0252938575)):
        with BuildLine():
            ThreePointArc((-14.35, -16.5), (-13.3248737342, -18.9748737342), (-10.85, -20))
            Line((-10.85, -20), (-14.35, -20))
            Line((-14.35, -20), (-14.35, -16.5))
        make_face()
    extrude(amount=F9_T7_DEPTH, mode=Mode.SUBTRACT)

    # F9_s10 → F9_t9 (cut)
    with BuildSketch(Plane(origin=(9.4017533237, -7.4976480845, 0), x_dir=(0, 0, 1), z_dir=(-0.7818314825, 0.6234898019, 0))):
        with BuildLine():
            ThreePointArc((-16.5, -14.35), (-18.9748737342, -13.3248737342), (-20, -10.85))
            Line((-20, -10.85), (-20, -14.35))
            Line((-20, -14.35), (-16.5, -14.35))
        make_face()
    extrude(amount=F9_T9_DEPTH, mode=Mode.SUBTRACT)

    # F9_s12 → F9_t11 (cut)
    with BuildSketch(Plane(origin=(11.7237946339, 2.6758796203, 0), x_dir=(0, 0, 1), z_dir=(-0.9749279122, -0.222520934, 0))):
        with BuildLine():
            ThreePointArc((-16.5, -14.35), (-18.9748737342, -13.3248737342), (-20, -10.85))
            Line((-20, -10.85), (-20, -14.35))
            Line((-20, -14.35), (-16.5, -14.35))
        make_face()
    extrude(amount=F9_T11_DEPTH, mode=Mode.SUBTRACT)

    # F9_s14 → F9_t13 (cut)
    with BuildSketch(Plane(origin=(5.2175794629, 10.834415393, 0), x_dir=(0, 0, 1), z_dir=(-0.4338837391, -0.9009688679, 0))):
        with BuildLine():
            ThreePointArc((-16.5, -14.35), (-18.9748737342, -13.3248737342), (-20, -10.85))
            Line((-20, -10.85), (-20, -14.35))
            Line((-20, -14.35), (-16.5, -14.35))
        make_face()
    extrude(amount=F9_T13_DEPTH, mode=Mode.SUBTRACT)

    # F10 (on face) → F11 (cut)
    with BuildSketch(Plane.YZ.offset(22.5)):
        Circle(F10_R)
    extrude(amount=-F11_DEPTH, mode=Mode.SUBTRACT)


solid = f1_7.part
